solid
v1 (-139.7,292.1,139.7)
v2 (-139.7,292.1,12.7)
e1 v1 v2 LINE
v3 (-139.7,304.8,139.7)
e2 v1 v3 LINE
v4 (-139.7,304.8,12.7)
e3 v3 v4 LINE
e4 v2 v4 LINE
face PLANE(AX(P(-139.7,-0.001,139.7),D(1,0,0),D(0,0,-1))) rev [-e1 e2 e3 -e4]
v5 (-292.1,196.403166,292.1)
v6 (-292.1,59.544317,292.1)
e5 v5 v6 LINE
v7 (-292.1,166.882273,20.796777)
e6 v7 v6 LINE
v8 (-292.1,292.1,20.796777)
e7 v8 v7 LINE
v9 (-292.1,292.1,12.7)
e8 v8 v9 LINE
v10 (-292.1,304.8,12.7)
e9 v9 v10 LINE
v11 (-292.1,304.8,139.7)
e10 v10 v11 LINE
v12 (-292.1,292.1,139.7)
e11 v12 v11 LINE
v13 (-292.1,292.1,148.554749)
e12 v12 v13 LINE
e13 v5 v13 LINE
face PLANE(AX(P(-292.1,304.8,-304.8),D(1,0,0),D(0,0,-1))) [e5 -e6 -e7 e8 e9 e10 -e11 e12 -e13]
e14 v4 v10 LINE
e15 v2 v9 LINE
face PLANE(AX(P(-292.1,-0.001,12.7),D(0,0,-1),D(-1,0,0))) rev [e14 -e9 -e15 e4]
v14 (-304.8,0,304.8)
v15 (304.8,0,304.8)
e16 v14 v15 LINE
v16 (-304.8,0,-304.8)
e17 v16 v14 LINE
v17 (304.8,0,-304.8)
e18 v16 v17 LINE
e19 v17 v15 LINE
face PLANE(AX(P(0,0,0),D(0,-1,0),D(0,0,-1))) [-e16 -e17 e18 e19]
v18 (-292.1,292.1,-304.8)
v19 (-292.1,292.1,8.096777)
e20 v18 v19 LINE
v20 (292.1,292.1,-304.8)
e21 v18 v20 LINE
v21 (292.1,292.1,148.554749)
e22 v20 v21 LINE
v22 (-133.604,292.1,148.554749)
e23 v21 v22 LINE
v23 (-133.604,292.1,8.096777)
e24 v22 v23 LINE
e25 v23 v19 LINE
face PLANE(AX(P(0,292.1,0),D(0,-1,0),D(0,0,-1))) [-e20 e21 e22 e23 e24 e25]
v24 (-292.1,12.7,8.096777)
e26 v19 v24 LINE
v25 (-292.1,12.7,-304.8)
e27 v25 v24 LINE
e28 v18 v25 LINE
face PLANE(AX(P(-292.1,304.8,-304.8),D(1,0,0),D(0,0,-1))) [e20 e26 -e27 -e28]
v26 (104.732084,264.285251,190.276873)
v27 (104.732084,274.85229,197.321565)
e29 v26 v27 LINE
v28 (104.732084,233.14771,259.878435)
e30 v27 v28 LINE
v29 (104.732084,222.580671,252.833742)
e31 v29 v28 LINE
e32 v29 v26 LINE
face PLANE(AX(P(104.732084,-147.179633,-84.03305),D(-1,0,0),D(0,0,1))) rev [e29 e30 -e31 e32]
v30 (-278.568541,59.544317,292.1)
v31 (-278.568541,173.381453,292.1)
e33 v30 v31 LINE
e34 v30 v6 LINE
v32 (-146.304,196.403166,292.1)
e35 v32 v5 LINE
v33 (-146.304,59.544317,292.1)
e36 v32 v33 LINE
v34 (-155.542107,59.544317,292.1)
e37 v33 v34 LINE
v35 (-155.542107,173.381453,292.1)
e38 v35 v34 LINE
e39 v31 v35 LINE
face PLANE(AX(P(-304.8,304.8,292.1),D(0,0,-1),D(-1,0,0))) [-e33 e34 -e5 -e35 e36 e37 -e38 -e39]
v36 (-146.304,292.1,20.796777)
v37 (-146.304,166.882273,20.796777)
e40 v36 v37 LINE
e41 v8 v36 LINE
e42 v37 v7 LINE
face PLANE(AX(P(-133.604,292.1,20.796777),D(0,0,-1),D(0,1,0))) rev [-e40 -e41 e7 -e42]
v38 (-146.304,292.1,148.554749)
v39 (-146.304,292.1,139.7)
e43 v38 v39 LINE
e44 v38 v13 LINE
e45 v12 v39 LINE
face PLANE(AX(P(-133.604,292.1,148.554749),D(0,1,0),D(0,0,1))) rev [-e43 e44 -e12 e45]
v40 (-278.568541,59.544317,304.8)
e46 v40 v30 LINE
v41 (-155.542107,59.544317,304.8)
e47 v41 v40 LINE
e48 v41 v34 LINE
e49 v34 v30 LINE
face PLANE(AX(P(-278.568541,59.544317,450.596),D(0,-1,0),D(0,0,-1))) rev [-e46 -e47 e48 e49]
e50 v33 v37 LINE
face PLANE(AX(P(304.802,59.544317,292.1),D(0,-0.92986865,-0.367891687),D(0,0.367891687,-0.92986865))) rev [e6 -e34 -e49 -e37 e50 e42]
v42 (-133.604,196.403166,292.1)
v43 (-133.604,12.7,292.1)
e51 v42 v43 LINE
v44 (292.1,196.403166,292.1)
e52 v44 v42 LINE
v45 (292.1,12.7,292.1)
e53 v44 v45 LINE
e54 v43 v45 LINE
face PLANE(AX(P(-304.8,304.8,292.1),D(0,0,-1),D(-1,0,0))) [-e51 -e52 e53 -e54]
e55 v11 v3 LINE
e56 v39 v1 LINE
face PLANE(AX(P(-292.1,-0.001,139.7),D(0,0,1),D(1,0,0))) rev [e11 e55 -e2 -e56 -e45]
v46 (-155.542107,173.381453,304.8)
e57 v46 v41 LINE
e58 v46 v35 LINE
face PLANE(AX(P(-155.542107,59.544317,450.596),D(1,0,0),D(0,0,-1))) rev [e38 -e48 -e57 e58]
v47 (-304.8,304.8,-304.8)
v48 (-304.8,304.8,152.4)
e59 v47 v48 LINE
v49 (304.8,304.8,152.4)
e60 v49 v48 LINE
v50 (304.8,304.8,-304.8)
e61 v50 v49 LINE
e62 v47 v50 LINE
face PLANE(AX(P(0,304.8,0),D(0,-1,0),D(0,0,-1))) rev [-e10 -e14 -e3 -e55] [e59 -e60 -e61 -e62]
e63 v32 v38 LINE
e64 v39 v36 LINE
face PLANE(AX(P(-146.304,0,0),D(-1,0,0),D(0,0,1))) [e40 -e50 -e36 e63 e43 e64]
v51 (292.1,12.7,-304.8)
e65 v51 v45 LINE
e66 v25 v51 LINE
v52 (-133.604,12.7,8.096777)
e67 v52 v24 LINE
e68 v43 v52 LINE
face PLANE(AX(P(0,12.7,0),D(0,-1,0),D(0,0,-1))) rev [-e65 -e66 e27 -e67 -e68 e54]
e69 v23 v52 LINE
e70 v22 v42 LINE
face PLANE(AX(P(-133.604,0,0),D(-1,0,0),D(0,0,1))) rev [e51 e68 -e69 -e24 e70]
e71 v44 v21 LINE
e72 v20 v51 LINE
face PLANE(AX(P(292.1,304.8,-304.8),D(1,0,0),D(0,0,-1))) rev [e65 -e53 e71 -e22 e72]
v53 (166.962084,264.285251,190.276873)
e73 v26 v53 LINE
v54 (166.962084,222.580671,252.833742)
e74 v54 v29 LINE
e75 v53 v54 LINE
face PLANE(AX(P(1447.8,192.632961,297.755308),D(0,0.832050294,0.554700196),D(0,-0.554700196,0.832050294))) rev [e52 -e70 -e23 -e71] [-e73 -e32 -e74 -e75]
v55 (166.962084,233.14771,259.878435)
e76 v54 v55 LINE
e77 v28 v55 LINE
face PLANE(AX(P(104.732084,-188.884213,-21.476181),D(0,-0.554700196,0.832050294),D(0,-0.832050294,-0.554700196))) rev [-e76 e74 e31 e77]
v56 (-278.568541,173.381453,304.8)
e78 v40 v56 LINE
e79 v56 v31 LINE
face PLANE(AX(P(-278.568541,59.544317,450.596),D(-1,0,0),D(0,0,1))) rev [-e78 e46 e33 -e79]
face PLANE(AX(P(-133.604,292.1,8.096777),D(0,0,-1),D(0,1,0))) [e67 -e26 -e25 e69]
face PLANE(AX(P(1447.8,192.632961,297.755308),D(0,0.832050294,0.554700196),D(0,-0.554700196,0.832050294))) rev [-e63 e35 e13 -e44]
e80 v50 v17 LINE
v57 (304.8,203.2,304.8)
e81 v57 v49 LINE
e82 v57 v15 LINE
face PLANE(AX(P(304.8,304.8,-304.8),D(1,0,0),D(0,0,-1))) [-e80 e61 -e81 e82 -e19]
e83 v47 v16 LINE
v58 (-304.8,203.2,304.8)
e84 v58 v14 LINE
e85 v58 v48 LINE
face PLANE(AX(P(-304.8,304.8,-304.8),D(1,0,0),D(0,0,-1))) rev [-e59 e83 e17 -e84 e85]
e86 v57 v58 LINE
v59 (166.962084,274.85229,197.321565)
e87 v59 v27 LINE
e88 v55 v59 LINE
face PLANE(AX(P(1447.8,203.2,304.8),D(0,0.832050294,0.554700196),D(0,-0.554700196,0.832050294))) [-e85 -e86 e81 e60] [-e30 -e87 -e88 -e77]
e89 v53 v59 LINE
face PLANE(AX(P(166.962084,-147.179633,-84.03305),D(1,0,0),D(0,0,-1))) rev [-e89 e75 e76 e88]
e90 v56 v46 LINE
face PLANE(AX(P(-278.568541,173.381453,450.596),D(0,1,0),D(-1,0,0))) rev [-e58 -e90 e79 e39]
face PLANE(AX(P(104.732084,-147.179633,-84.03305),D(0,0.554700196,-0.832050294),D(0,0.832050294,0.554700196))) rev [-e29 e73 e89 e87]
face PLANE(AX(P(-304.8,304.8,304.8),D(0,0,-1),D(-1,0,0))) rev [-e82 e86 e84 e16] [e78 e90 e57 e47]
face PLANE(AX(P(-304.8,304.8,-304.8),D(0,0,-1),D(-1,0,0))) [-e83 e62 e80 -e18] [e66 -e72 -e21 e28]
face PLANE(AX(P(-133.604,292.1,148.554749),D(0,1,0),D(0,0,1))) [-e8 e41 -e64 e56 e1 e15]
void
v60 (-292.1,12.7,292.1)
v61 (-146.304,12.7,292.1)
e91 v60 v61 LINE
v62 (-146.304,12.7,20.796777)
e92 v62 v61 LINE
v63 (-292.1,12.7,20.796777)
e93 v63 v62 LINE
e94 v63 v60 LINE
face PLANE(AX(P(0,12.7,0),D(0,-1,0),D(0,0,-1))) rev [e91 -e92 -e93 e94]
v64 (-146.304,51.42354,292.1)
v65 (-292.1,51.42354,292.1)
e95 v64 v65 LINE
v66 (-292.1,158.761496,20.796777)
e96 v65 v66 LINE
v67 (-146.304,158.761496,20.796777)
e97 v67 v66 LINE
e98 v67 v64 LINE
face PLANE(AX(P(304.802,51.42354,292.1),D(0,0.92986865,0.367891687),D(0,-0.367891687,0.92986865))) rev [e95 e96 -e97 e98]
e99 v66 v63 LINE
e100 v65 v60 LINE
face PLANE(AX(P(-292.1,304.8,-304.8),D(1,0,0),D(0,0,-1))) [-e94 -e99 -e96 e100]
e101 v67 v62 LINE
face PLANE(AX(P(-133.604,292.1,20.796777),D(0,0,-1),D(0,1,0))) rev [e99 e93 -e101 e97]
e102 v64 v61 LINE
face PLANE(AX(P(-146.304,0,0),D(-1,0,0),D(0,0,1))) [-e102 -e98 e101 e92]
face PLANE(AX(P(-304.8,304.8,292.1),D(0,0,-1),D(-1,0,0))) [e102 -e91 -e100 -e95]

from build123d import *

# Parameters (mm, degrees)
SKETCH1_W               = 609.6
SKETCH1_H               = 609.6
BOSS_EXTRUDE1_DEPTH     = 304.8
CUT_EXTRUDE2_DEPTH      = 747.6044736
CUT_EXTRUDE2_DEPTH_BACK = 609.6
SHELL11_T               = -12.7
CUT_EXTRUDE5_REACH      = 645.809
SKETCH12_W              = 62.23
SKETCH12_H              = 75.184
CUT_EXTRUDE6_REACH      = 529.929
SKETCH13_W              = 152.4
SKETCH13_H              = 127
BOSS_EXTRUDE2_DEPTH     = 158.496
SHELL13_START           = -292.1
SHELL13_DEPTH           = 145.796
BOSS_EXTRUDE4_REACH     = 738.271
SKETCH16_W              = 123.026433271
SKETCH16_H              = 113.837135886
CUT_EXTRUDE7_DEPTH      = 158.496


# Read off the part's stored shape, not the designer's step: Shell13
with BuildPart() as part:
    # Sketch1 → Boss-Extrude1 (new body)
    with BuildSketch(Plane(origin=(0, 0, 0), x_dir=(1, 0, 0), z_dir=(0, 1, 0))):
        Rectangle(SKETCH1_W, SKETCH1_H)
    extrude(amount=BOSS_EXTRUDE1_DEPTH)

    # Sketch11 → Cut-Extrude2 (cut, two sides: drawn at the far end of the back side and taken through both)
    with BuildSketch(Plane(origin=(304.8, 0, 0), x_dir=(0, 0, -1), z_dir=(1, 0, 0)).offset(-CUT_EXTRUDE2_DEPTH_BACK)):
        Polygon((-1382.429640083, -515.219760055), (-304.8, 203.2), (-152.4, 304.8), (925.229640083, 1023.219760055), (-511.609880028, 3178.47904022), (-2819.269160193, 1640.03952011), align=None)
    extrude(amount=CUT_EXTRUDE2_DEPTH + CUT_EXTRUDE2_DEPTH_BACK, mode=Mode.SUBTRACT)

    # Shell11
    shell11_openings = [part.faces().sort_by_distance(p)[0] for p in [
        (0, 152.4, -304.8),
    ]]
    offset(amount=SHELL11_T, openings=shell11_openings, kind=Kind.INTERSECTION)

    # Sketch12 → Cut-Extrude5 (cut, up to next)
    with BuildSketch(Plane(origin=(0, 281.353846154, 187.569230769), x_dir=(1, 0, 0), z_dir=(0, 0.8320502943378435, 0.5547001962252293)), mode=Mode.PRIVATE) as cut_extrude5_sk1:
        with Locations((135.847083822, -49.312847444)):
            Rectangle(SKETCH12_W, SKETCH12_H)
    cut_extrude5_tool1 = extrude(cut_extrude5_sk1.sketch, amount=-CUT_EXTRUDE5_REACH, mode=Mode.PRIVATE) & part.part
    add(cut_extrude5_tool1.solids().sort_by_distance((135.847084, 254, 228.6))[0], mode=Mode.SUBTRACT)

    # Sketch13 → Cut-Extrude6 (cut, up to next)
    with BuildSketch(Plane(origin=(0, 304.8, 0), x_dir=(1, 0, 0), z_dir=(0, 1, 0)), mode=Mode.PRIVATE) as cut_extrude6_sk1:
        with Locations((-215.9, -76.2)):
            Rectangle(SKETCH13_W, SKETCH13_H)
    cut_extrude6_tool1 = extrude(cut_extrude6_sk1.sketch, amount=-CUT_EXTRUDE6_REACH, mode=Mode.PRIVATE) & part.part
    add(cut_extrude6_tool1.solids().sort_by_distance((-215.9, 304.8, 76.2))[0], mode=Mode.SUBTRACT)

    # Sketch14 → Boss-Extrude2 (add)
    with BuildSketch(Plane(origin=(-292.1, 0, 0), x_dir=(0, 0, -1), z_dir=(1, 0, 0))):
        Polygon((-292.1, 12.7), (-8.096776742, 12.7), (-8.096776742, 292.1), (-148.554749401, 292.1), (-292.1, 196.403166267), align=None)
    extrude(amount=BOSS_EXTRUDE2_DEPTH)

    # Shell13 outline → Shell13 (cut)
    with BuildSketch(Plane.YZ.offset(SHELL13_START)):
        Polygon((196.403166267, 292.1), (12.7, 292.1), (12.7, 20.796776742), (292.1, 20.796776742), (292.1, 148.554749401), align=None)
    extrude(amount=SHELL13_DEPTH, mode=Mode.SUBTRACT)

    # Sketch15 → Boss-Extrude4 (add, up to next)
    with BuildSketch(Plane(origin=(-292.1, 0, 0), x_dir=(0, 0, -1), z_dir=(1, 0, 0)), mode=Mode.PRIVATE) as boss_extrude4_sk1:
        Polygon((-292.1, 59.544316955), (-20.796776742, 166.882273248), (-20.796776742, 158.761495931), (-292.1, 51.423539637), align=None)
    boss_extrude4_tool1 = extrude(boss_extrude4_sk1.sketch, amount=BOSS_EXTRUDE4_REACH, mode=Mode.PRIVATE) - part.part
    add(boss_extrude4_tool1.solids().sort_by_distance((-292.1, 109.152906, 156.448388))[0])

    # Sketch16 → Cut-Extrude7 (cut)
    with BuildSketch(Plane(origin=(0, 0, 292.1), x_dir=(-1, 0, 0), z_dir=(0, 0, -1))):
        with Locations((217.055324109, 116.462884898)):
            Rectangle(SKETCH16_W, SKETCH16_H)
    extrude(amount=-CUT_EXTRUDE7_DEPTH, mode=Mode.SUBTRACT)


solid = part.part
